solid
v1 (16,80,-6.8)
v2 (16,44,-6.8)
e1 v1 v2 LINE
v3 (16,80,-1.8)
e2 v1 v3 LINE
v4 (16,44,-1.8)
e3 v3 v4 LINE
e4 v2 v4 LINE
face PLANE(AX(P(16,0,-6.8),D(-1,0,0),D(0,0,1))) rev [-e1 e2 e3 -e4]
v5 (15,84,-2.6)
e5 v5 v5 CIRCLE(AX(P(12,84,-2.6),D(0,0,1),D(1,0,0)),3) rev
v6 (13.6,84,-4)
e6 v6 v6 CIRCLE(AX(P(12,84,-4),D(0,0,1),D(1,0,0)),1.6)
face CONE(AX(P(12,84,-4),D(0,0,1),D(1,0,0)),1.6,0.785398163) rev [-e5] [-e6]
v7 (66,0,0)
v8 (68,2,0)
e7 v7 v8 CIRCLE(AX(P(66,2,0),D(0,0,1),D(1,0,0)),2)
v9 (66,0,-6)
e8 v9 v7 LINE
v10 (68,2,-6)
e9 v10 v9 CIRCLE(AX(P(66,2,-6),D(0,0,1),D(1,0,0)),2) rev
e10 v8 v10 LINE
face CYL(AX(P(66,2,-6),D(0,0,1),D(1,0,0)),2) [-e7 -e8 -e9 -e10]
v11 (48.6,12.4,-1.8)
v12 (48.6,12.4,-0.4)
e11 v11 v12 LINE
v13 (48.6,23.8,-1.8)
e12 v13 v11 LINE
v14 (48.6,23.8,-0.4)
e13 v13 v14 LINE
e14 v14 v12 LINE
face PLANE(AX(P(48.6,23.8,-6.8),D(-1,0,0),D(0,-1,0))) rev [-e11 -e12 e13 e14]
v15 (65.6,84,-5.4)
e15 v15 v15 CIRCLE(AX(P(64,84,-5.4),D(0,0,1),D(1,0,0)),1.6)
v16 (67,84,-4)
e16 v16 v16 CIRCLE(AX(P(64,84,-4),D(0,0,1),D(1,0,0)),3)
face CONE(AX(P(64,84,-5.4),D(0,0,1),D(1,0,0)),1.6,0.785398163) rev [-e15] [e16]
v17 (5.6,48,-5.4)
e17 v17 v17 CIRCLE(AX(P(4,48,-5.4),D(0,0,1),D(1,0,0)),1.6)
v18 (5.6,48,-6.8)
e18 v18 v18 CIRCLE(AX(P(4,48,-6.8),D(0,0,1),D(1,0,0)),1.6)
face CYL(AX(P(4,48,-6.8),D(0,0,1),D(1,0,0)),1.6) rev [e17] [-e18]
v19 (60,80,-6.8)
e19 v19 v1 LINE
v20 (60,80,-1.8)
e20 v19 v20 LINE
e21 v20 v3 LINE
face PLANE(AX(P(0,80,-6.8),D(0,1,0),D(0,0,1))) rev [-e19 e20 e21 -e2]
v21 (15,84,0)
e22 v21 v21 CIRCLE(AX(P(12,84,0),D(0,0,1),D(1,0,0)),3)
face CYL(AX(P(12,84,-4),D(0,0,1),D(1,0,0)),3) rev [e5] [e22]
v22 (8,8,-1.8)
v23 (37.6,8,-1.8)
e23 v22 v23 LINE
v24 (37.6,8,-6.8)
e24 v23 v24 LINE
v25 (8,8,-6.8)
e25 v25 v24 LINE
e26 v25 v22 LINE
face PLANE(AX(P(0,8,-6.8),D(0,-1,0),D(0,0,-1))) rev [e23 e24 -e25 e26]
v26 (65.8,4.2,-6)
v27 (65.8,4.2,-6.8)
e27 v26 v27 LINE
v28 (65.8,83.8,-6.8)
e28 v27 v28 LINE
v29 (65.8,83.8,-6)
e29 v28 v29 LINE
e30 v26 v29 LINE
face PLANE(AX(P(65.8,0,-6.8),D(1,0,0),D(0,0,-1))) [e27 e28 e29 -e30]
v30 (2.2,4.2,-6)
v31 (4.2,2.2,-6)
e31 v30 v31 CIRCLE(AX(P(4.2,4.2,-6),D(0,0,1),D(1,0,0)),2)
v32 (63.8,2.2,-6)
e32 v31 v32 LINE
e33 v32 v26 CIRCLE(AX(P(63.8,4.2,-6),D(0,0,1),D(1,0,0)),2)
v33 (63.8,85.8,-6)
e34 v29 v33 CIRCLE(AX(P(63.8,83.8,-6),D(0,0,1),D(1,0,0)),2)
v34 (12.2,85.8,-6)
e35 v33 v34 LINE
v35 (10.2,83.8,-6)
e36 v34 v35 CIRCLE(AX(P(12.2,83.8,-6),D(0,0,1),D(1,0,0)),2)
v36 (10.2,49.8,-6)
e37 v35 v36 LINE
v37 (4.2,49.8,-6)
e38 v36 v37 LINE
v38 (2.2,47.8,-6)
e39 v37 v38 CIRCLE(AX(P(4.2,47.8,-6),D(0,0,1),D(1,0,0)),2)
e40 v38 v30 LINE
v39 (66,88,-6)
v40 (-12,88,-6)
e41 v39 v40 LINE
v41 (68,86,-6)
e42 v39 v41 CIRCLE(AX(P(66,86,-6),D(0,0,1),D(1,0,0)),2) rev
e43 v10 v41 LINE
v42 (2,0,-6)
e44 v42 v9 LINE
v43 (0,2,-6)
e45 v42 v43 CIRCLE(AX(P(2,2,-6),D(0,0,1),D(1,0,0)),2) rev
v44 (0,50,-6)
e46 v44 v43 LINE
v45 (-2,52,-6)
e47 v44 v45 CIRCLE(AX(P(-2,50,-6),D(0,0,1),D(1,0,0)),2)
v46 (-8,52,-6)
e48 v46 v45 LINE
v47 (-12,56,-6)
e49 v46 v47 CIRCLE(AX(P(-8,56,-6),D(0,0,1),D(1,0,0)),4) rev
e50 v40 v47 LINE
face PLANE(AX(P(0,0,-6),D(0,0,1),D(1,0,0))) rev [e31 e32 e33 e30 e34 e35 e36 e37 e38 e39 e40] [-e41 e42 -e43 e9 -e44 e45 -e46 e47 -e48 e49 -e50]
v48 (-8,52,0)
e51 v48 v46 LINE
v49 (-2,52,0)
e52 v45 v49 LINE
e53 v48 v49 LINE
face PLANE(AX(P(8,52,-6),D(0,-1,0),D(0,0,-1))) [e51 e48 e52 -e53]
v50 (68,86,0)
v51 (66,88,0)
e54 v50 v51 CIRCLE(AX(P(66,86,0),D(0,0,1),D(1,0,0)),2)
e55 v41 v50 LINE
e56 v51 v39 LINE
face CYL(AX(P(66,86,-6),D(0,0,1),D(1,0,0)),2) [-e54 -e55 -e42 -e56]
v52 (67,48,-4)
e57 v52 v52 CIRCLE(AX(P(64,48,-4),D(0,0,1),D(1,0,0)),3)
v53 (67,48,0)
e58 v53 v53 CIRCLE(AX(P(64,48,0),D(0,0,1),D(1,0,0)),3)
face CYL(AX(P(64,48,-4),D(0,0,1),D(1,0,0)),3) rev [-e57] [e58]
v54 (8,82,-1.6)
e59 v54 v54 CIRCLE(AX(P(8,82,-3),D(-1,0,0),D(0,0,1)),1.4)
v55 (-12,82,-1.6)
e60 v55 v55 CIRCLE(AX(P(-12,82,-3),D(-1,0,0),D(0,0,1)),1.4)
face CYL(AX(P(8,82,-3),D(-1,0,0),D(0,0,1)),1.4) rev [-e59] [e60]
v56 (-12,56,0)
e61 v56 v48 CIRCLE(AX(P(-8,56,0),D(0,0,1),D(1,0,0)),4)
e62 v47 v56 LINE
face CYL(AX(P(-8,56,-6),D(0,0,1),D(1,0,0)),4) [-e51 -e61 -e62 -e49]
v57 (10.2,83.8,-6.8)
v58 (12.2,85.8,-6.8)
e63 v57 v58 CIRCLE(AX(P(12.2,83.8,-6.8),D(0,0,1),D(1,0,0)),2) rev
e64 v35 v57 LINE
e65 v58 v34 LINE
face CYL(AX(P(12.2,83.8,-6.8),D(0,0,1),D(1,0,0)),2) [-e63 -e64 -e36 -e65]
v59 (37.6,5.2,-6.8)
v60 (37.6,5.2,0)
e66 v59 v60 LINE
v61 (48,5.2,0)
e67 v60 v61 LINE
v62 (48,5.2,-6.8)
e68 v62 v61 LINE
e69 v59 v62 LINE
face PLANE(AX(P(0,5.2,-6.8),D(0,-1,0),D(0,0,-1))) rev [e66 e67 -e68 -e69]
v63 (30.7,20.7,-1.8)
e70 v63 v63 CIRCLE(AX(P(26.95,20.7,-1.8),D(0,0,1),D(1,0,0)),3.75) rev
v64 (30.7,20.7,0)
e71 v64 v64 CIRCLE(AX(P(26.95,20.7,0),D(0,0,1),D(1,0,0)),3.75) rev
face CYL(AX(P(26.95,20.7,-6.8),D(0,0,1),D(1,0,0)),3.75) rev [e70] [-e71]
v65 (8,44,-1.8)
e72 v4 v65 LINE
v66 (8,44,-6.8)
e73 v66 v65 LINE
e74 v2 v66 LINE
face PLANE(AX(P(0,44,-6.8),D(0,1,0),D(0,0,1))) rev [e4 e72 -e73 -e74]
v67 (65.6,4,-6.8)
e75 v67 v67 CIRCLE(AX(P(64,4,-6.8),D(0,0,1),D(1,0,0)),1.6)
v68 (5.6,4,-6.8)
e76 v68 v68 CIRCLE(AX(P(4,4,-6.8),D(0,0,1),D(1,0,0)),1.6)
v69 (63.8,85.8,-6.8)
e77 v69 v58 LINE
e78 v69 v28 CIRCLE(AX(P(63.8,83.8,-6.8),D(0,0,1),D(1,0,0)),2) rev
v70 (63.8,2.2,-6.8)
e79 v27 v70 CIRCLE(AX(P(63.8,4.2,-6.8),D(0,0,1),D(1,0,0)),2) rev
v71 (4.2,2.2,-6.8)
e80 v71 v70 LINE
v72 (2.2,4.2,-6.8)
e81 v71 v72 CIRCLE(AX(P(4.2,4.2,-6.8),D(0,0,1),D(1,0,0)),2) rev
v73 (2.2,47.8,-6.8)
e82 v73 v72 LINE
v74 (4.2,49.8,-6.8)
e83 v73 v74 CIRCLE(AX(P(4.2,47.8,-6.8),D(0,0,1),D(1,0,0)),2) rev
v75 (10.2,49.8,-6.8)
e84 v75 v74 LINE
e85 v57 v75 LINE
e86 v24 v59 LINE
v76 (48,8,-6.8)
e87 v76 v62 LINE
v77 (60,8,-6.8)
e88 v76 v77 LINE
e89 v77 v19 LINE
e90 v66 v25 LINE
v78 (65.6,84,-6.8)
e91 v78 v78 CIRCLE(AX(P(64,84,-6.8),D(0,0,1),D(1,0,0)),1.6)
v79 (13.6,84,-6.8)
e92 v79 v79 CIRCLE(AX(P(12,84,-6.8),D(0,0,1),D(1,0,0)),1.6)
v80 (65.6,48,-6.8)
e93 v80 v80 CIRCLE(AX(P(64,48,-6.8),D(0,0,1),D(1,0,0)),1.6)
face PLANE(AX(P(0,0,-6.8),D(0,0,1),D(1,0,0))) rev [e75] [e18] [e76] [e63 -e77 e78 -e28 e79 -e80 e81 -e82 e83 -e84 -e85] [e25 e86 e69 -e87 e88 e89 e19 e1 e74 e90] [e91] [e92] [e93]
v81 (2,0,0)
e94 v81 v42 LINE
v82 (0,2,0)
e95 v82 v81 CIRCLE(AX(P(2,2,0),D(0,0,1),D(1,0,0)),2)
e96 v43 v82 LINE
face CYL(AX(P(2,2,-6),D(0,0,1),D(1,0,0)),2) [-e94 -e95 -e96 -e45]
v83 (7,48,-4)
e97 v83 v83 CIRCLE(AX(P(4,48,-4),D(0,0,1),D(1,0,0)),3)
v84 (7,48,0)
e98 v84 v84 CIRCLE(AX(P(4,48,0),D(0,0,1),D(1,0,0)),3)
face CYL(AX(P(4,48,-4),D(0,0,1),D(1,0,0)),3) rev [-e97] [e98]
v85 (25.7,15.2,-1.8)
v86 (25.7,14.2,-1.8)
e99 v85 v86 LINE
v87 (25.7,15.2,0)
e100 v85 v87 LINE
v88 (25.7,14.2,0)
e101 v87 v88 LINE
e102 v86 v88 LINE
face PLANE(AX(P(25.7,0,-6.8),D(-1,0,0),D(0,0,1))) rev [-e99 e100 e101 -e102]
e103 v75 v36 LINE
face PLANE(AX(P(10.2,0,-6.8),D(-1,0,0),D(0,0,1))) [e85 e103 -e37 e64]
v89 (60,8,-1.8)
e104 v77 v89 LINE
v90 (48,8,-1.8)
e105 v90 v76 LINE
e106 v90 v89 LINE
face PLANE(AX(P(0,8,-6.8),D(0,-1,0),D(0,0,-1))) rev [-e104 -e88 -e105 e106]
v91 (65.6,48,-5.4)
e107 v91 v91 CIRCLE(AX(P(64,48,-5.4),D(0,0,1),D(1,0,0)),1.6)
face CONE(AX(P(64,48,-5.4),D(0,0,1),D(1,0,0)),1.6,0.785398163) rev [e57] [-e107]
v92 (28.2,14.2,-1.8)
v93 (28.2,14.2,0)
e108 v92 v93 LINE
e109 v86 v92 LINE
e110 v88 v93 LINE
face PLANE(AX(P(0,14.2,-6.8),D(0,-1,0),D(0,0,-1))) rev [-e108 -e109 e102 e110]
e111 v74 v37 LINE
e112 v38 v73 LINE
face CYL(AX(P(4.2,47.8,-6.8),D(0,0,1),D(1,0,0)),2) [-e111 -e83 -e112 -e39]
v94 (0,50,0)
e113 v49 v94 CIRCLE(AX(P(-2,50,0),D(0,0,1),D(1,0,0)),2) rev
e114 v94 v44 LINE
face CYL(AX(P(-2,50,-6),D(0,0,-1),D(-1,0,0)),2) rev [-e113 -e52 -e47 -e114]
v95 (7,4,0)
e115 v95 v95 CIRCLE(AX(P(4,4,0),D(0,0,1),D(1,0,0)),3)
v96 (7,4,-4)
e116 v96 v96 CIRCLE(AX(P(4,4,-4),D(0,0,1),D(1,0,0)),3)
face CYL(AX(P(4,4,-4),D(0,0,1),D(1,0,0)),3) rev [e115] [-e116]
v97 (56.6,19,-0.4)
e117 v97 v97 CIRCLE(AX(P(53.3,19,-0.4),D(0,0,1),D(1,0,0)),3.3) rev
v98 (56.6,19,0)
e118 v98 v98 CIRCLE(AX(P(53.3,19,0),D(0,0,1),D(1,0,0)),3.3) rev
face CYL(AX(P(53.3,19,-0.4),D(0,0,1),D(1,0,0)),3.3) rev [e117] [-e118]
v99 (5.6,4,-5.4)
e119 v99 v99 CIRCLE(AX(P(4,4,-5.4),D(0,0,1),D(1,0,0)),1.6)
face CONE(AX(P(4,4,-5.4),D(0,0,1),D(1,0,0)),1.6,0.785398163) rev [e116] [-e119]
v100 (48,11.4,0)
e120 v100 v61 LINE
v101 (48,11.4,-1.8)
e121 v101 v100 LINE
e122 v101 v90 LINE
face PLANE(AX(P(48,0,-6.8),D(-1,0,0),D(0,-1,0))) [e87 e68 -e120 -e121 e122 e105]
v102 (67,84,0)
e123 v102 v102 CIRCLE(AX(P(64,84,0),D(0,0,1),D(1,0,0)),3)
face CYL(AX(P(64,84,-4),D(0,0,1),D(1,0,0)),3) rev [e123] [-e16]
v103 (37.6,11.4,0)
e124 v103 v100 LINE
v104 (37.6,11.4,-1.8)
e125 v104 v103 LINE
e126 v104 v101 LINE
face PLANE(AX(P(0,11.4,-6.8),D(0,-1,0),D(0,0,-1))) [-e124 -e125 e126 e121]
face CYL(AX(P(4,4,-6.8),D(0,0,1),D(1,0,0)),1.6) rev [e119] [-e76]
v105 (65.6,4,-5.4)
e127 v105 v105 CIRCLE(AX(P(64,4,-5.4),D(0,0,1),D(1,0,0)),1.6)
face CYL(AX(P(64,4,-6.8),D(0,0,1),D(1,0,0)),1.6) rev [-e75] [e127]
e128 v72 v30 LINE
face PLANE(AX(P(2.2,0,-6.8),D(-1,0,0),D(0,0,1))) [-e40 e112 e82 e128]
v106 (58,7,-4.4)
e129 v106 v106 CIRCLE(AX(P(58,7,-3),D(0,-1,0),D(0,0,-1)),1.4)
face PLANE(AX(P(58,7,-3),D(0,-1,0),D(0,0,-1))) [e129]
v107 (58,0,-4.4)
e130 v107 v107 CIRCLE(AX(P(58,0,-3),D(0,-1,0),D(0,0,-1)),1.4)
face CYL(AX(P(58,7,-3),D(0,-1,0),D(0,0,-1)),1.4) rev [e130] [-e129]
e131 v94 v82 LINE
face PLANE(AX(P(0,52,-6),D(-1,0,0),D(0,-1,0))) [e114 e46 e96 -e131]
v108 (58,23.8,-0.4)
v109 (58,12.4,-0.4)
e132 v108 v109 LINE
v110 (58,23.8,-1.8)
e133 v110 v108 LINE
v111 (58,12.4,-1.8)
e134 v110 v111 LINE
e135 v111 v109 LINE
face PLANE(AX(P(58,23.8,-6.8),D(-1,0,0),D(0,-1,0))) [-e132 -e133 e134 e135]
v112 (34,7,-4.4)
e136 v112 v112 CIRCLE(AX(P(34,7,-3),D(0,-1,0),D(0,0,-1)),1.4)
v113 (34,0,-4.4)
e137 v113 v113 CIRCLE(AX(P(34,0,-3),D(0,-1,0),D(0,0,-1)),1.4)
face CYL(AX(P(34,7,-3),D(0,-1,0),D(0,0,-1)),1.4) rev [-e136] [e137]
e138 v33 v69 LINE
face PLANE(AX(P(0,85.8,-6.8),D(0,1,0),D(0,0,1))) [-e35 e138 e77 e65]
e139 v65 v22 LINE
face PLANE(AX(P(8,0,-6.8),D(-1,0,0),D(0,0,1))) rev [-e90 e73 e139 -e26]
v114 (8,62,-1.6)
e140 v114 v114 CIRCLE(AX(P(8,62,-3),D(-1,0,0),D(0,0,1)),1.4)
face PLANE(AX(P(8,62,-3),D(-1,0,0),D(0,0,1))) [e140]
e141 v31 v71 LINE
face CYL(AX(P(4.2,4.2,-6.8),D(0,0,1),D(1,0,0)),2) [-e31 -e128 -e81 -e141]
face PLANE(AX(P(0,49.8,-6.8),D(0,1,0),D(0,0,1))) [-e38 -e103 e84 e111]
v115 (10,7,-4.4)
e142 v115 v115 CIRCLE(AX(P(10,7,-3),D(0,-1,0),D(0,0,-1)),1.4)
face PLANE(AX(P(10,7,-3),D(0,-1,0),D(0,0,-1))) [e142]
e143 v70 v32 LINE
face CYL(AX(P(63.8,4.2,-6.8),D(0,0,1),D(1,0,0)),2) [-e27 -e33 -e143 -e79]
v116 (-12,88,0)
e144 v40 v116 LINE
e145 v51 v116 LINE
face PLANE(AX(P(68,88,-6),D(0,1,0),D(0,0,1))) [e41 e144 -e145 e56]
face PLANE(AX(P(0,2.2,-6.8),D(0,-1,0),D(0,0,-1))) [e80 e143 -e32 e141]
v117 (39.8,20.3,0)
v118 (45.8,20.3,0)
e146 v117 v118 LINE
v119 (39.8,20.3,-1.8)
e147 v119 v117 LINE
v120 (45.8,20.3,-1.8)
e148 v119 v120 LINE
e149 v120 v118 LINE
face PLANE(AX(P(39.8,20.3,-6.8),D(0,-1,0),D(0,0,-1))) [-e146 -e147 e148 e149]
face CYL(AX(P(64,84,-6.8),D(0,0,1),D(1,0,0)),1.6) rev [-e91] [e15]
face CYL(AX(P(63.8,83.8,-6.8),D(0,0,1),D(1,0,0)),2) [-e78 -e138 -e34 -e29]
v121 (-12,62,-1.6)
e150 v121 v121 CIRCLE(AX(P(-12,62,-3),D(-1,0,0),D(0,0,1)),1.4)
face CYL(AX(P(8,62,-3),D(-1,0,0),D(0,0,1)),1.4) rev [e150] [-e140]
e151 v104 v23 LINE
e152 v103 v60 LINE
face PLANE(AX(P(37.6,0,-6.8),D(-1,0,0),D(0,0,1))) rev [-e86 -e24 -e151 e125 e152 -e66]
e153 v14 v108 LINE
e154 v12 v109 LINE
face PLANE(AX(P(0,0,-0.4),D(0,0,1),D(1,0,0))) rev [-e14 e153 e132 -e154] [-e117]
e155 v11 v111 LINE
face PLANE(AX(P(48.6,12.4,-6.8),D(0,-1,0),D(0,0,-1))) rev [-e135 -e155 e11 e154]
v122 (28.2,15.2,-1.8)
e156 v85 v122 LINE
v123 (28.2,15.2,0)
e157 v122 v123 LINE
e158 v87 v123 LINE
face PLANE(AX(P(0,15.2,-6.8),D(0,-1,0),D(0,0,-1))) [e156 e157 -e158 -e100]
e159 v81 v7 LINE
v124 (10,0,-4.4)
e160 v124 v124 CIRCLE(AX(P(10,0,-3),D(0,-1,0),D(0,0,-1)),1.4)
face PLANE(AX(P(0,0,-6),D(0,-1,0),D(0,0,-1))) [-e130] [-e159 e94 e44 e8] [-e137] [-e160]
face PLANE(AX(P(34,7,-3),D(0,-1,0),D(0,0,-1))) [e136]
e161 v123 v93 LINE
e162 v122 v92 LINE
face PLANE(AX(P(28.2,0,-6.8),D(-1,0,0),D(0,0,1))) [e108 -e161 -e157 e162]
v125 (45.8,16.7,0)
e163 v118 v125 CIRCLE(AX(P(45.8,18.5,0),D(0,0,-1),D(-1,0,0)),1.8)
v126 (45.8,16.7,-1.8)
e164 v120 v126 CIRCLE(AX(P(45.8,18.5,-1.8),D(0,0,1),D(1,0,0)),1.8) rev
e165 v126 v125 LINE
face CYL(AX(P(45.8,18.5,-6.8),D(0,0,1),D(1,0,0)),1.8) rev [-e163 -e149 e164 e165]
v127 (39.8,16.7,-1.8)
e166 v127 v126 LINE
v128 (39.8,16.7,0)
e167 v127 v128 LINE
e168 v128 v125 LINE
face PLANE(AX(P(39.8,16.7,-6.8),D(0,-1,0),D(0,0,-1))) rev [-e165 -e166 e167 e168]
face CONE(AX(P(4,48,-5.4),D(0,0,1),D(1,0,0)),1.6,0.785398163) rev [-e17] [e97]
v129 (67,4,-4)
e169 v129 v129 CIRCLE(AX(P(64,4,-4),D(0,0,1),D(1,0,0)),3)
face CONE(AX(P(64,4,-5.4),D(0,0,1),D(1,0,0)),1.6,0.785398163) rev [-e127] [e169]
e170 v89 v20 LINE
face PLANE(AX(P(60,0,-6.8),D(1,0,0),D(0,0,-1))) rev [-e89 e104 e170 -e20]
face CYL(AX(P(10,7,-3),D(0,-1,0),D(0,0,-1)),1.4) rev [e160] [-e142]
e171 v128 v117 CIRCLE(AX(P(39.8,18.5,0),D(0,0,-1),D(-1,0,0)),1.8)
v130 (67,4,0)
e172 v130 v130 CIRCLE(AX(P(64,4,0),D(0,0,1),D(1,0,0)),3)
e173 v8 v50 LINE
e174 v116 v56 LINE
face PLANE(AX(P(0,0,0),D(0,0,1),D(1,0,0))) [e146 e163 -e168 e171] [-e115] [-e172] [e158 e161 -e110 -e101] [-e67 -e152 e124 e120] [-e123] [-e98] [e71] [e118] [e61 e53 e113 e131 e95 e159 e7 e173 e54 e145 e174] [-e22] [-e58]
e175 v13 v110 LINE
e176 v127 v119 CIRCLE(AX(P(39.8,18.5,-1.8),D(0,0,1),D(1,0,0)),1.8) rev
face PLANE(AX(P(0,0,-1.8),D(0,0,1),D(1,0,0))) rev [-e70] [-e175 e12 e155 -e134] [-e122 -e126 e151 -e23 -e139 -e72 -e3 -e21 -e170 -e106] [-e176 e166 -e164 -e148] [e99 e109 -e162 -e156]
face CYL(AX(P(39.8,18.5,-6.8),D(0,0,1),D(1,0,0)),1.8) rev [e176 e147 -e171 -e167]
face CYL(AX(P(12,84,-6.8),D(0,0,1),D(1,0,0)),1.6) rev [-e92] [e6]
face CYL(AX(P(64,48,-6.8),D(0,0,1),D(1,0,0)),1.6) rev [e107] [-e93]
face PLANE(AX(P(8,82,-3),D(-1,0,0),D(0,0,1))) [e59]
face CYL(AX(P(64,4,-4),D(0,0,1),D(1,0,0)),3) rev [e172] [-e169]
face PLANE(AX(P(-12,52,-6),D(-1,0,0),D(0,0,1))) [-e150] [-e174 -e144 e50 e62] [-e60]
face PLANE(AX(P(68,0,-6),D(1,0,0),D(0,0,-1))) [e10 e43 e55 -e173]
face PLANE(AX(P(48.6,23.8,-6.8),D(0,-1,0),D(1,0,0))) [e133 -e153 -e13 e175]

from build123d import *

# Parameters (mm, degrees)
EXTRUDE_1_DEPTH          = 6
EXTRUDE_4_DEPTH          = 6.8
CUT_EXTRUDE_START        = -1.8
CUT_EXTRUDE_6_DEPTH      = 110.619208398
FILLET_1_R               = 2
CUT_EXTRUDE_4_DEPTH      = 112.419208398
CUT_EXTRUDE_4_DEPTH_BACK = 112.419208398
SKETCH_4_R               = 1.6
SKETCH_5_R               = 3.75
SKETCH_5_W               = 10.4
SKETCH_5_H               = 6.2
SKETCH_5_W_2             = 2.5
SKETCH_5_H_2             = 1
SKETCH_5_W_3             = 9.4
SKETCH_5_H_3             = 11.4
CUT_EXTRUDE_5_DEPTH      = 112.419208398
SKETCH_5_3_W             = 9.4
SKETCH_5_3_H             = 11.4
SKETCH_5_3_R             = 3.3
EXTRUDE_5_DEPTH          = 0.4
SKETCH_6_W               = 20
SKETCH_6_H               = 36
EXTRUDE_7_DEPTH          = 6
FILLET_2_R               = 2
FILLET_3_R               = 4
SKETCH_7_R               = 1.4
CUT_EXTRUDE_7_DEPTH      = 20
SKETCH_4_3_R             = 3
SKETCH_4_3_R_2           = 1.6
CUT_EXTRUDE_8_DEPTH      = 4
SKETCH_8_R               = 1.4
CUT_EXTRUDE_9_DEPTH      = 7
CHAMFER_1_SIZE           = 1.4


with BuildPart() as part:
    # 草图1 → 凸台-拉伸1 (new body)
    with BuildSketch(Plane.XY):
        Polygon((0, 0), (68, 0), (68, 88), (8, 88), (8, 52), (0, 52), align=None)
    extrude(amount=-EXTRUDE_1_DEPTH)

    # 草图1<2> → 凸台-拉伸4 (add)
    with BuildSketch(Plane.XY):
        Polygon((2.2, 49.8), (2.2, 2.2), (65.8, 2.2), (65.8, 85.8), (10.2, 85.8), (10.2, 49.8), align=None)
        Polygon((8, 44), (8, 8), (60, 8), (60, 80), (16, 80), (16, 44), align=None, mode=Mode.SUBTRACT)
    extrude(amount=-EXTRUDE_4_DEPTH)

    # 草图1<5> → 切除-拉伸6 (cut, through all)
    with BuildSketch(Plane.XY.offset(CUT_EXTRUDE_START)):
        Polygon((16, 80), (16, 44), (8, 44), (8, 8), (60, 8), (60, 80), align=None)
    extrude(amount=-CUT_EXTRUDE_6_DEPTH, mode=Mode.SUBTRACT)

    # 圆角1
    fillet_1_edges = [part.edges().sort_by_distance(p)[0] for p in [
        (68, 88, -3),
        (68, 0, -3),
        (0, 0, -3),
        (10.2, 85.8, -6.4),
        (65.8, 85.8, -6.4),
        (65.8, 2.2, -6.4),
        (2.2, 2.2, -6.4),
        (2.2, 49.8, -6.4),
    ]]
    fillet(fillet_1_edges, radius=FILLET_1_R)

    # 草图4 → 切除-拉伸4 (cut, two sides: drawn at the far end of the back side and taken through both)
    with BuildSketch(Plane.XY.offset(-CUT_EXTRUDE_4_DEPTH_BACK)):
        with Locations((12, 84)):
            Circle(SKETCH_4_R)
        with Locations((64, 84)):
            Circle(SKETCH_4_R)
        with Locations((64, 4)):
            Circle(SKETCH_4_R)
        with Locations((4, 48)):
            Circle(SKETCH_4_R)
        with Locations((4, 4)):
            Circle(SKETCH_4_R)
        with Locations((64, 48)):
            Circle(SKETCH_4_R)
    extrude(amount=CUT_EXTRUDE_4_DEPTH + CUT_EXTRUDE_4_DEPTH_BACK, mode=Mode.SUBTRACT)

    # 草图5 → 切除-拉伸5 (cut, through all)
    with BuildSketch(Plane.XY):
        with Locations((26.95, 20.7)):
            Circle(SKETCH_5_R)
        with Locations((42.8, 8.3)):
            Rectangle(SKETCH_5_W, SKETCH_5_H)
        with Locations((26.95, 14.7)):
            Rectangle(SKETCH_5_W_2, SKETCH_5_H_2)
        with Locations((53.3, 18.1)):
            Rectangle(SKETCH_5_W_3, SKETCH_5_H_3)
        with BuildLine():
            Line((39.8, 16.7), (45.8, 16.7))
            ThreePointArc((45.8, 16.7), (47.6, 18.5), (45.8, 20.3))
            Line((45.8, 20.3), (39.8, 20.3))
            ThreePointArc((39.8, 20.3), (38, 18.5), (39.8, 16.7))
        make_face()
    extrude(amount=-CUT_EXTRUDE_5_DEPTH, mode=Mode.SUBTRACT)

    # 草图5<3> → 凸台-拉伸5 (add)
    with BuildSketch(Plane.XY):
        with Locations((53.3, 18.1)):
            Rectangle(SKETCH_5_3_W, SKETCH_5_3_H)
        with Locations((53.3, 19)):
            Circle(SKETCH_5_3_R, mode=Mode.SUBTRACT)
    extrude(amount=-EXTRUDE_5_DEPTH)

    # 草图6 → 凸台-拉伸7 (add)
    with BuildSketch(Plane.XY):
        with Locations((-2, 70)):
            Rectangle(SKETCH_6_W, SKETCH_6_H)
    extrude(amount=-EXTRUDE_7_DEPTH)

    # 圆角2
    fillet_2_edges = [part.edges().sort_by_distance(p)[0] for p in [
        (0, 52, -3),
    ]]
    fillet(fillet_2_edges, radius=FILLET_2_R)

    # 圆角3
    fillet_3_edges = [part.edges().sort_by_distance(p)[0] for p in [
        (-12, 52, -3),
    ]]
    fillet(fillet_3_edges, radius=FILLET_3_R)

    # 草图7 → 切除-拉伸7 (cut)
    with BuildSketch(Plane.ZY.offset(12)):
        with Locations((-3, 82)):
            Circle(SKETCH_7_R)
        with Locations((-3, 62)):
            Circle(SKETCH_7_R)
    extrude(amount=-CUT_EXTRUDE_7_DEPTH, mode=Mode.SUBTRACT)

    # 草图4<3> → 切除-拉伸8 (cut)
    # profile 1 of 6: a face of its own
    with BuildSketch(Plane.XY):
        with Locations((12, 84)):
            Circle(SKETCH_4_3_R)
        with Locations((12, 84)):
            Circle(SKETCH_4_3_R_2, mode=Mode.SUBTRACT)
    # profile 2 of 6: a face of its own
    with BuildSketch(Plane.XY):
        with Locations((64, 84)):
            Circle(SKETCH_4_3_R)
        with Locations((64, 84)):
            Circle(SKETCH_4_3_R_2, mode=Mode.SUBTRACT)
    # profile 3 of 6: a face of its own
    with BuildSketch(Plane.XY):
        with Locations((4, 48)):
            Circle(SKETCH_4_3_R)
        with Locations((4, 48)):
            Circle(SKETCH_4_3_R_2, mode=Mode.SUBTRACT)
    # profile 4 of 6: a face of its own
    with BuildSketch(Plane.XY):
        with Locations((64, 48)):
            Circle(SKETCH_4_3_R)
        with Locations((64, 48)):
            Circle(SKETCH_4_3_R_2, mode=Mode.SUBTRACT)
    # profile 5 of 6: a face of its own
    with BuildSketch(Plane.XY):
        with Locations((4, 4)):
            Circle(SKETCH_4_3_R)
        with Locations((4, 4)):
            Circle(SKETCH_4_3_R_2, mode=Mode.SUBTRACT)
    # profile 6 of 6: a face of its own
    with BuildSketch(Plane.XY):
        with Locations((64, 4)):
            Circle(SKETCH_4_3_R)
        with Locations((64, 4)):
            Circle(SKETCH_4_3_R_2, mode=Mode.SUBTRACT)
    extrude(amount=-CUT_EXTRUDE_8_DEPTH, mode=Mode.SUBTRACT)

    # 草图8 → 切除-拉伸9 (cut)
    with BuildSketch(Plane.XZ):
        with Locations(Location((58, -3, 0), (0, 0, 270))):
            Circle(SKETCH_8_R)
        with Locations(Location((10, -3, 0), (0, 0, 270))):
            Circle(SKETCH_8_R)
        with Locations(Location((34, -3, 0), (0, 0, 270))):
            Circle(SKETCH_8_R)
    extrude(amount=-CUT_EXTRUDE_9_DEPTH, mode=Mode.SUBTRACT)

    # 倒角1
    chamfer_1_edges = [part.edges().sort_by_distance(p)[0] for p in [
        (2.4, 4, -4),
        (62.4, 48, -4),
        (2.4, 48, -4),
        (62.4, 84, -4),
        (62.4, 4, -4),
        (9, 84, -4),
    ]]
    chamfer(chamfer_1_edges, length=CHAMFER_1_SIZE - 0.0001)  # a hair under: the kernel refuses the full size


solid = part.part
